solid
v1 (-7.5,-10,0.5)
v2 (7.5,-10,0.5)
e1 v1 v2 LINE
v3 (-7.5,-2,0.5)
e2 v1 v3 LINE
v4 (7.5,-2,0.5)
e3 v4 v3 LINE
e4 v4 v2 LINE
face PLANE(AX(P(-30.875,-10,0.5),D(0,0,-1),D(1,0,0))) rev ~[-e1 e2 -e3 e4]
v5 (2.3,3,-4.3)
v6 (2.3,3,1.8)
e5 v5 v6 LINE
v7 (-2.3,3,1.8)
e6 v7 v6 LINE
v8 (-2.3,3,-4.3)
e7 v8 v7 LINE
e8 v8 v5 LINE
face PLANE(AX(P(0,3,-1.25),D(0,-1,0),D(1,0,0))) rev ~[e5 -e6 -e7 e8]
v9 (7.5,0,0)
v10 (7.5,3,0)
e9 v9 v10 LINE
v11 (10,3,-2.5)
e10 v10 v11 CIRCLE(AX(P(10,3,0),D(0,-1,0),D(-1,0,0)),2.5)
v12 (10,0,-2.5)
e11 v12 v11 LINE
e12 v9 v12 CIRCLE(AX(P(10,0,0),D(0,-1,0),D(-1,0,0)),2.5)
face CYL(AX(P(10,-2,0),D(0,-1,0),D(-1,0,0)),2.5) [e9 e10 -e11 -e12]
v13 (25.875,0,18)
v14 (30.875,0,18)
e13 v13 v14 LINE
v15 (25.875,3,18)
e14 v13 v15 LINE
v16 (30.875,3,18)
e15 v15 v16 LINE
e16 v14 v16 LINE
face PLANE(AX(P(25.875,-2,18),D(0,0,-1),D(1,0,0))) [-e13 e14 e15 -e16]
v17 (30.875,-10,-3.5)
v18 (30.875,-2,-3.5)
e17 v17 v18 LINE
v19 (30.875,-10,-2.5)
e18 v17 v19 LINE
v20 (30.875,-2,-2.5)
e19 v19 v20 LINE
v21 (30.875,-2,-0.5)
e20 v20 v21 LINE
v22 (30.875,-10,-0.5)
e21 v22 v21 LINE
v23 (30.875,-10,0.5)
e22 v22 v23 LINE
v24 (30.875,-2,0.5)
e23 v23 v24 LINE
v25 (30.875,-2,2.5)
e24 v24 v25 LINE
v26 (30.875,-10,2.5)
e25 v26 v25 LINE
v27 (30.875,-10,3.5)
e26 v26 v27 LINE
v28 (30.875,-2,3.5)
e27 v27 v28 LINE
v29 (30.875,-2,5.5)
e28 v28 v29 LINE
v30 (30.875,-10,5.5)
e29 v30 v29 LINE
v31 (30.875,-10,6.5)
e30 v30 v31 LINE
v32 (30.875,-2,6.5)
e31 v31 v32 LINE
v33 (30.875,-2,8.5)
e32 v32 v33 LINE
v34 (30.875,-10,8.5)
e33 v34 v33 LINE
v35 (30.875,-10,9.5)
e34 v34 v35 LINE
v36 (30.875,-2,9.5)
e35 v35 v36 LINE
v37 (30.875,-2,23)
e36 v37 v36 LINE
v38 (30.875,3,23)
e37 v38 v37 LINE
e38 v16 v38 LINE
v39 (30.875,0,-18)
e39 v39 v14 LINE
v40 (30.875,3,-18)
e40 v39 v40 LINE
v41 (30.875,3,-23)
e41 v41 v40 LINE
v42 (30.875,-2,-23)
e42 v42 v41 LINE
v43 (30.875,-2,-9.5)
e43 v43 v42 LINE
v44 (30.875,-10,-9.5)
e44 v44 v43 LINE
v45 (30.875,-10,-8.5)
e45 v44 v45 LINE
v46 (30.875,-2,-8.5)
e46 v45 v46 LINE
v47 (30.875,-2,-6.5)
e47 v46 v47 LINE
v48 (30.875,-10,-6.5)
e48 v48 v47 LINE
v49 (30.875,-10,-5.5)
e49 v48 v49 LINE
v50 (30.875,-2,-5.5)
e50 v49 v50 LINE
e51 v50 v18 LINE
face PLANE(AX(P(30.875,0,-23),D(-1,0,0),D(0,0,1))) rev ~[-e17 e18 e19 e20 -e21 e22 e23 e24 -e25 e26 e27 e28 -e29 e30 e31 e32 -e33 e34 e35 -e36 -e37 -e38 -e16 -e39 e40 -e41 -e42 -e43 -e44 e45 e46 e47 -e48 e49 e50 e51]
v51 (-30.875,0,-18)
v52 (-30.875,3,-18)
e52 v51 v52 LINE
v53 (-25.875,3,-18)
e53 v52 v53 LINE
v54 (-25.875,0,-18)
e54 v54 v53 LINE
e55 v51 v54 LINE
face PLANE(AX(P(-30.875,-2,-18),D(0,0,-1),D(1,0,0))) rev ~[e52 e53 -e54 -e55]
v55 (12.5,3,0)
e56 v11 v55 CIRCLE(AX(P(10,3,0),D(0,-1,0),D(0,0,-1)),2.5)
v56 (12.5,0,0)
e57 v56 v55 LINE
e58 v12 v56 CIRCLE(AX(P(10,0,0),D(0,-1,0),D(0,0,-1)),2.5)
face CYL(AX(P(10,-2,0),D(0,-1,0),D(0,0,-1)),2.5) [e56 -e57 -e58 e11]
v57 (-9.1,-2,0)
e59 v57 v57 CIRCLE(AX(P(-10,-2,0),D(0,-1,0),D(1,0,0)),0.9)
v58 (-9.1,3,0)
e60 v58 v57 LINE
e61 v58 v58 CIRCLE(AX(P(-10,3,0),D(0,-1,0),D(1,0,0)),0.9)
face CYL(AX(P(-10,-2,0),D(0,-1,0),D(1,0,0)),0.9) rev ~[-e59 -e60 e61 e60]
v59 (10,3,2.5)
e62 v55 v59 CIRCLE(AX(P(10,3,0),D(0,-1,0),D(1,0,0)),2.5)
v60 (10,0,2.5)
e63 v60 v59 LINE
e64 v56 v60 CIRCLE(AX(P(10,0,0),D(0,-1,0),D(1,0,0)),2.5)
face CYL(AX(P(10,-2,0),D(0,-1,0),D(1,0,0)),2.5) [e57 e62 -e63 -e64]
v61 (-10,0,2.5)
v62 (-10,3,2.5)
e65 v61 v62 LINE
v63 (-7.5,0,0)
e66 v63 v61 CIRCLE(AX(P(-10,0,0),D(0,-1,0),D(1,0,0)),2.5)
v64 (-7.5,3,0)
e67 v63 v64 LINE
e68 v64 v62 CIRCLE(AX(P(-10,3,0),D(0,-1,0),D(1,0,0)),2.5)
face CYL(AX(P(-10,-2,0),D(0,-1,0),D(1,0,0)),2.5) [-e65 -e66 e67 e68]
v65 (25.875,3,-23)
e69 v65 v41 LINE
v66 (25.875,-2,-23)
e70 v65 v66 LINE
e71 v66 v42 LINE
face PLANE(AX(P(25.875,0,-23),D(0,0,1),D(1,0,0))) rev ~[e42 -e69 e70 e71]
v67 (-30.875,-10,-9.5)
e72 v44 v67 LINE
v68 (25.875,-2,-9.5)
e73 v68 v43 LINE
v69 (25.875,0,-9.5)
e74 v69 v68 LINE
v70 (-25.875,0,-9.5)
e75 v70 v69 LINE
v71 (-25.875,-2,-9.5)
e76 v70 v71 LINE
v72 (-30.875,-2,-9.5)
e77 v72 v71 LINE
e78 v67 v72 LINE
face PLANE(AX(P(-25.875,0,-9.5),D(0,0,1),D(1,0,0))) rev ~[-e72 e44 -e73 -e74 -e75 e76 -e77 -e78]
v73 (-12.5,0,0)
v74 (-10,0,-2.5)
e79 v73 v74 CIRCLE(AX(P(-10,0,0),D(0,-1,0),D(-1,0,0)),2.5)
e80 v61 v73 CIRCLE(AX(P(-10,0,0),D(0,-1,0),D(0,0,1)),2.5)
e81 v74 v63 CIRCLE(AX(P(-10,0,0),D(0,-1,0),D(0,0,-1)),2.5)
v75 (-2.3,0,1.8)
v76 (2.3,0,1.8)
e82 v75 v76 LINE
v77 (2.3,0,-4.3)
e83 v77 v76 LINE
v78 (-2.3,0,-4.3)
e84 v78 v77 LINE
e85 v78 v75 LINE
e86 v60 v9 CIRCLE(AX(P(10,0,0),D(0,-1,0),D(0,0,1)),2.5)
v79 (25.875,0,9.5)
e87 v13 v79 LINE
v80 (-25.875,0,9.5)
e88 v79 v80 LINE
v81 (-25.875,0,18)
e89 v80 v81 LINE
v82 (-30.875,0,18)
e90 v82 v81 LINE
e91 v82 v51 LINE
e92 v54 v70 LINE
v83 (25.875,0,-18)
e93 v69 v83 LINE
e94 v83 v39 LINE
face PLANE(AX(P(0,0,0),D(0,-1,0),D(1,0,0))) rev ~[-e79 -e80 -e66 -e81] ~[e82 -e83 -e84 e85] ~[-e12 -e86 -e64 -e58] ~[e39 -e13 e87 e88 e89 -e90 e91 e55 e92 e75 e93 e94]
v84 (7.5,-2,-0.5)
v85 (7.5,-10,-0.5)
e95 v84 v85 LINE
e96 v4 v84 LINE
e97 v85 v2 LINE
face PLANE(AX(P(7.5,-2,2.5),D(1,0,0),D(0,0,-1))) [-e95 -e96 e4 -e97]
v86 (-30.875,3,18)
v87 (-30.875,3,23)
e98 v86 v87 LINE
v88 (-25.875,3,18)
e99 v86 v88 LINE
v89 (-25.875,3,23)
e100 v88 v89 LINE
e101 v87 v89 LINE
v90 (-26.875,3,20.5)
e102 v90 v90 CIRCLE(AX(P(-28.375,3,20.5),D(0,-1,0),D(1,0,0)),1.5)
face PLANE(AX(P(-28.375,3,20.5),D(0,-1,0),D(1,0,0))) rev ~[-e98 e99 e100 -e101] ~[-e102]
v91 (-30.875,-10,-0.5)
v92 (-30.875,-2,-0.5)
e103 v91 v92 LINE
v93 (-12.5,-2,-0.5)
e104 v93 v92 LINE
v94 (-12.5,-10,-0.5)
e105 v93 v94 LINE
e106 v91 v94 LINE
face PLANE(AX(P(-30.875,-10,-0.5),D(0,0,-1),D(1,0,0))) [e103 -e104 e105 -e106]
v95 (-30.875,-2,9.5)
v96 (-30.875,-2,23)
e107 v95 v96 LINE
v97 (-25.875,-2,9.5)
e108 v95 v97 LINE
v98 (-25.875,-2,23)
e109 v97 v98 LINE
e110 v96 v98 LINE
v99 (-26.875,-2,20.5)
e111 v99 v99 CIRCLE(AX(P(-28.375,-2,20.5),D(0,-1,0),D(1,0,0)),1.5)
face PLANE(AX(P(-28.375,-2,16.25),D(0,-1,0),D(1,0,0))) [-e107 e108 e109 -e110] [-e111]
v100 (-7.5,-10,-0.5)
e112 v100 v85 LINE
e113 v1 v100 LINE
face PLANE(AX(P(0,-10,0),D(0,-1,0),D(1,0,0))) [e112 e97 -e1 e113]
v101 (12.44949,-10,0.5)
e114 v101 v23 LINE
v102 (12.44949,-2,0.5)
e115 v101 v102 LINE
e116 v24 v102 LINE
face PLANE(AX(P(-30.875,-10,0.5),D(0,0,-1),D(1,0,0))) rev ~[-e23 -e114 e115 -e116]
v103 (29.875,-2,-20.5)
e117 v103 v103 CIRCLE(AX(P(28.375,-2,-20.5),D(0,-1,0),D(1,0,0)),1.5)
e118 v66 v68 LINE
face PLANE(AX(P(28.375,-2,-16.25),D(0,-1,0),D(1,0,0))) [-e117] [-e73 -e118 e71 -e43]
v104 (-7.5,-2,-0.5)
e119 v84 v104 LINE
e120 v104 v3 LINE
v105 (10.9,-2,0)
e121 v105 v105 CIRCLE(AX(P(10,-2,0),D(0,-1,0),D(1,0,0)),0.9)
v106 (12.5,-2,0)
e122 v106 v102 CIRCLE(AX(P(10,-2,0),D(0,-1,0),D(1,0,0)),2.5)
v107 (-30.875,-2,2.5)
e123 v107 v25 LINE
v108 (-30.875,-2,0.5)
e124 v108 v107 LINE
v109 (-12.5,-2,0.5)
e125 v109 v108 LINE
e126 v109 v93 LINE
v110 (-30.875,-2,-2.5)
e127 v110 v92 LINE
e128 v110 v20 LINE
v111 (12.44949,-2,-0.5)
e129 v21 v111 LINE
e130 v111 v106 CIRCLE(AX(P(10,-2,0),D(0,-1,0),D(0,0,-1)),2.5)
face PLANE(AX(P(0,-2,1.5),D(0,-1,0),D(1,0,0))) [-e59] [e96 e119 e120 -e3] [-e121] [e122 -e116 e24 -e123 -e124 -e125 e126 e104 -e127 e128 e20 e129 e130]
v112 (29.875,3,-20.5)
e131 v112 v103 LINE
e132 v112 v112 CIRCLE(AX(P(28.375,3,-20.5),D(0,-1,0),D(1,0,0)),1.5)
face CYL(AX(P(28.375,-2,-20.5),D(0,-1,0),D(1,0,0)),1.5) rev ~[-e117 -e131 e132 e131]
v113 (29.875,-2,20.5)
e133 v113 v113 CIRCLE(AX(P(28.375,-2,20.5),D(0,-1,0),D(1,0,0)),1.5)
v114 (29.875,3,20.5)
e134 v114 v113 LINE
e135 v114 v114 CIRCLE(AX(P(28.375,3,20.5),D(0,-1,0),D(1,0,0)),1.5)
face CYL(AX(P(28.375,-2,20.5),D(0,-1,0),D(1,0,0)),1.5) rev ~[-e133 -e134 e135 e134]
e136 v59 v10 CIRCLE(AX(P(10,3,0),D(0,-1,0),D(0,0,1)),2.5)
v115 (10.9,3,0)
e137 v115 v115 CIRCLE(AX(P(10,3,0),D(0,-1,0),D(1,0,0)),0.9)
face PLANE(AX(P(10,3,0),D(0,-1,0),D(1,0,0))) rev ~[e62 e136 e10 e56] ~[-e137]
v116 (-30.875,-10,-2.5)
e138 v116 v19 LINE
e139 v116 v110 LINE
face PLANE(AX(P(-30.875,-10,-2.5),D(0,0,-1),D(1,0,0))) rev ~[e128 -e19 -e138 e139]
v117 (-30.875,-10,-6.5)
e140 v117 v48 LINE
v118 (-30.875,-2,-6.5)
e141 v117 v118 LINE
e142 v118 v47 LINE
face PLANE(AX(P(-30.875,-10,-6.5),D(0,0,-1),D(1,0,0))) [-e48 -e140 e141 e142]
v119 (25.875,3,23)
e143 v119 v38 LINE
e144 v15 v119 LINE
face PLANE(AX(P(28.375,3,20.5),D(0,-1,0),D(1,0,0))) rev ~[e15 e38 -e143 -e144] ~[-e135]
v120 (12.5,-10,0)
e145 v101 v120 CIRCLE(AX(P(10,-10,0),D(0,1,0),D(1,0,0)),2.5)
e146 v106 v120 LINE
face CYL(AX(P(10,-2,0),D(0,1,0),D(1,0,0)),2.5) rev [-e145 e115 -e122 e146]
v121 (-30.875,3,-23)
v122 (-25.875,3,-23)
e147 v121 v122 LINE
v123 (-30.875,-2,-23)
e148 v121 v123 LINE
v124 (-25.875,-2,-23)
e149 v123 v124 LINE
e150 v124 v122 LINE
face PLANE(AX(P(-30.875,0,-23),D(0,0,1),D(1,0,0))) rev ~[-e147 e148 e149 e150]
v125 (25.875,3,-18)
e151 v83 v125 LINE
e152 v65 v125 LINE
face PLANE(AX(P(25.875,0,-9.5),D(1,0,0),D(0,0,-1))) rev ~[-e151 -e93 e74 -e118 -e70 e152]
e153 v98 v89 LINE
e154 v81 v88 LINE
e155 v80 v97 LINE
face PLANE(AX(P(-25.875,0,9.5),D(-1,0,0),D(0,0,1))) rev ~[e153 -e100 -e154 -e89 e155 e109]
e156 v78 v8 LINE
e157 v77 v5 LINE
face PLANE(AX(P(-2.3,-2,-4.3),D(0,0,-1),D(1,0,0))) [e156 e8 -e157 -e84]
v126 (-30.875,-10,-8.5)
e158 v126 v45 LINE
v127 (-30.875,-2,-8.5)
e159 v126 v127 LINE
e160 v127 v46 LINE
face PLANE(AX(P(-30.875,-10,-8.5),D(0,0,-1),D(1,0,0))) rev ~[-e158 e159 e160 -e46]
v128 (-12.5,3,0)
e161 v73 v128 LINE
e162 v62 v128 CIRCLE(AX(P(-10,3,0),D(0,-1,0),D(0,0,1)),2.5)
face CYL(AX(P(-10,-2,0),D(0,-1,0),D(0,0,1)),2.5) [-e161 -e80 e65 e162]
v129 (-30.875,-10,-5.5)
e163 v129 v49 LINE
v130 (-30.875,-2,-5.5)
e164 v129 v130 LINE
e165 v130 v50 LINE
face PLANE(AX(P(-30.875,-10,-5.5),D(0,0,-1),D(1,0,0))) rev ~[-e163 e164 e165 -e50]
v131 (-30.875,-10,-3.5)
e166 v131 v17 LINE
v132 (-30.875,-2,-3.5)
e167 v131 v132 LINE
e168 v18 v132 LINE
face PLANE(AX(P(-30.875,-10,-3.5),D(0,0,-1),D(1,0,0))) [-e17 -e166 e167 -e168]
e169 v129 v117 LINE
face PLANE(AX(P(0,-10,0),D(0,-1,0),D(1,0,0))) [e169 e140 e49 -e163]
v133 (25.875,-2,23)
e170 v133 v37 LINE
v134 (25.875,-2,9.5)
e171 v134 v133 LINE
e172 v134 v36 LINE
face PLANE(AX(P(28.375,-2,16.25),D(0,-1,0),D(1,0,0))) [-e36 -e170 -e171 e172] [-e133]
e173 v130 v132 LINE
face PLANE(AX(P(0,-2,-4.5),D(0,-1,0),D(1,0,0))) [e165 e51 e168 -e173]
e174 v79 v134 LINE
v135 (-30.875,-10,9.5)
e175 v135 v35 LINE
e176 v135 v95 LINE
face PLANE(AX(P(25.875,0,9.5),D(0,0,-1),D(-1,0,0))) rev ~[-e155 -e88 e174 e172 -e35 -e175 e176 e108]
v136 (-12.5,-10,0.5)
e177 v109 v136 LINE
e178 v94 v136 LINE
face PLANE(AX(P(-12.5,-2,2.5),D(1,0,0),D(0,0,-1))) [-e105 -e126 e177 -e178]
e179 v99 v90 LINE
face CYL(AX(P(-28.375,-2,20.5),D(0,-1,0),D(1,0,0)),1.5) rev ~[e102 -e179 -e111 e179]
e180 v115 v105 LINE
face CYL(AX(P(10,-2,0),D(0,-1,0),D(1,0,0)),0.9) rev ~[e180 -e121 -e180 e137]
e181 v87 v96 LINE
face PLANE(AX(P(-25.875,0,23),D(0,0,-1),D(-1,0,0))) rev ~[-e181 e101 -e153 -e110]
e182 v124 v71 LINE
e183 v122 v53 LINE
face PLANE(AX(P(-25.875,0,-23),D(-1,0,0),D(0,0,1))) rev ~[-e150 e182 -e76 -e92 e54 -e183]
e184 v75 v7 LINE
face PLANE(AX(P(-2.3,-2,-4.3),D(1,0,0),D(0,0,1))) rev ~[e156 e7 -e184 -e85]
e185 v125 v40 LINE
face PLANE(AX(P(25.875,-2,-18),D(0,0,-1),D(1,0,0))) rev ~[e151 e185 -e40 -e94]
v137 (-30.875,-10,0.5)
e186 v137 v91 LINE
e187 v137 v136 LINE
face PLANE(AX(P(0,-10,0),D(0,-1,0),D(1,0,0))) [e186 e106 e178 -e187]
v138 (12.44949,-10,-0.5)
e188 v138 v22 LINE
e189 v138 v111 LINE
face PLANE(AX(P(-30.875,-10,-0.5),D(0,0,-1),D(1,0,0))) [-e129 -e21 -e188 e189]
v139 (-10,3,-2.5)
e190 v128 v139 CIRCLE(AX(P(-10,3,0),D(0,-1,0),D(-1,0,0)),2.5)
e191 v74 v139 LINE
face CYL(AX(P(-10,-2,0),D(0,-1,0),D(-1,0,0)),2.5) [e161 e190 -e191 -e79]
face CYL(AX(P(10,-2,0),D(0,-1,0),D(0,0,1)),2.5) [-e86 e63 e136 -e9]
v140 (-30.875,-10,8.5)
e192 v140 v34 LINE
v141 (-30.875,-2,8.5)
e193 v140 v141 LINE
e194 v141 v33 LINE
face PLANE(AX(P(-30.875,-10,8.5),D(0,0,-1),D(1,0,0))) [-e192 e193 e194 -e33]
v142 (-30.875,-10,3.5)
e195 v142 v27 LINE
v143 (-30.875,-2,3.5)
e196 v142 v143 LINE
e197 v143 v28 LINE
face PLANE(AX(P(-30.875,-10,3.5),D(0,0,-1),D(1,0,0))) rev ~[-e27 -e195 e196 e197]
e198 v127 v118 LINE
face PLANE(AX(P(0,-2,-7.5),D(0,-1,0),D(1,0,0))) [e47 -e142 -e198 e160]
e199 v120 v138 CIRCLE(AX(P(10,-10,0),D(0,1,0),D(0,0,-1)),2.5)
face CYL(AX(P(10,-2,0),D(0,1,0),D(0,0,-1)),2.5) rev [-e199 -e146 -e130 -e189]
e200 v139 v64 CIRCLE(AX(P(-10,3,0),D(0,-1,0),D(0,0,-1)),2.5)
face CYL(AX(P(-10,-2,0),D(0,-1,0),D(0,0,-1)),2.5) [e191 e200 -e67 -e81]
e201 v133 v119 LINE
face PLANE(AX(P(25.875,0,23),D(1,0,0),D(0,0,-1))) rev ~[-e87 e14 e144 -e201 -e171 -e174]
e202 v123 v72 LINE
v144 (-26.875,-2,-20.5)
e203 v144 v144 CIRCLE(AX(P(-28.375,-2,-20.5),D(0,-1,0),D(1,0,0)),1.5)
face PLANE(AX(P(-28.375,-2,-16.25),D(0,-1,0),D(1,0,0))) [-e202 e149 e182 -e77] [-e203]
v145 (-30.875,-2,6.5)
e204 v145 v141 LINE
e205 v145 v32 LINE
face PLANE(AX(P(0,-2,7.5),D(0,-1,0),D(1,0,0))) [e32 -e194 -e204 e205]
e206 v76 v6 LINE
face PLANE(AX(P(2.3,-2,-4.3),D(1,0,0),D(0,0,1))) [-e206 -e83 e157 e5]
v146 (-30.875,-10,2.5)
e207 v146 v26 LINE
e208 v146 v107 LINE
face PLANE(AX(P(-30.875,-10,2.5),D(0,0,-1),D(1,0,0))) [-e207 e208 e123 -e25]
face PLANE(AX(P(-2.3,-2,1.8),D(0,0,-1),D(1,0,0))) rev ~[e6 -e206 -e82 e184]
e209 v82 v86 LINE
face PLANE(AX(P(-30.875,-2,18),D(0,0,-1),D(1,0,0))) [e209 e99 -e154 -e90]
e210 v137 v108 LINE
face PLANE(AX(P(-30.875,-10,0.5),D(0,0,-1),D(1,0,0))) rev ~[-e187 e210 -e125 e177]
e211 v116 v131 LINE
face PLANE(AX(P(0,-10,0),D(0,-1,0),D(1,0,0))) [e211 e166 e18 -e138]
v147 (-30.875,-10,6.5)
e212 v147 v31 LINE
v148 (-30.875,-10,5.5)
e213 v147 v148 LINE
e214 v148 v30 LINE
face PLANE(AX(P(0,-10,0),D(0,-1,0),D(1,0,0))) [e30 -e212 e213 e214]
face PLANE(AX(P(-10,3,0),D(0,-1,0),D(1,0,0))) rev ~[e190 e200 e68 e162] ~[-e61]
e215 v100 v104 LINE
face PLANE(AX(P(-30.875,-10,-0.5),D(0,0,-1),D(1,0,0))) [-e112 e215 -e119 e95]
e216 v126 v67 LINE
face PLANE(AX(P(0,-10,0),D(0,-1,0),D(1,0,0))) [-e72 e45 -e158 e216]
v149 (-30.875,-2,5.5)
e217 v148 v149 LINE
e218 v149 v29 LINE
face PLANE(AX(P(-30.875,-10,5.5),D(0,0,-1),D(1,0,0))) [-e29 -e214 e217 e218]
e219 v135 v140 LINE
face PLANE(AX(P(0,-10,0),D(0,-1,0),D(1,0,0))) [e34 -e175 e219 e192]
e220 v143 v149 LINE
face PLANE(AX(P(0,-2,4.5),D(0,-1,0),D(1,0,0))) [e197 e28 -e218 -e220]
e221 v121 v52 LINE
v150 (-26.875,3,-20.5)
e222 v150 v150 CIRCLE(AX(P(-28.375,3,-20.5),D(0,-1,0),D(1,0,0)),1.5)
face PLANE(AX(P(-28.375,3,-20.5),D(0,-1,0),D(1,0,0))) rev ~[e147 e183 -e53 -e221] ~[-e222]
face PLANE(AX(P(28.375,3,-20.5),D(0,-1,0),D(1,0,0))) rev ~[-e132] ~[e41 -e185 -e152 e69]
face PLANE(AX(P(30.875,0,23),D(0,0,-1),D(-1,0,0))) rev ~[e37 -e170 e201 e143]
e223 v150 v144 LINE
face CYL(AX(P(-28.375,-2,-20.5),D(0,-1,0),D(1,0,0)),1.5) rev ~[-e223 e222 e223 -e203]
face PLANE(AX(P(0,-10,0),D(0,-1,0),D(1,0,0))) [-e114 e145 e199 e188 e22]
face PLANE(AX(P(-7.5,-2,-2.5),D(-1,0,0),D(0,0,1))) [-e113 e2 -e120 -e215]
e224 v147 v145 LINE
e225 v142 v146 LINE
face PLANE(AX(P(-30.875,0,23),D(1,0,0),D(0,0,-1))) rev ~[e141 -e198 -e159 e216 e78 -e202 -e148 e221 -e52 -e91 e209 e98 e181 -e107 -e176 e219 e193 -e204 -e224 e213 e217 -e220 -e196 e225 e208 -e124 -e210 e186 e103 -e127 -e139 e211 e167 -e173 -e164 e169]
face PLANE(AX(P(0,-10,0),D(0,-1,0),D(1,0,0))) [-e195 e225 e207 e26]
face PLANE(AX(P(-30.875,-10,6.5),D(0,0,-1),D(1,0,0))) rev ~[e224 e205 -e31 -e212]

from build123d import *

# Parameters (mm, degrees)
F1_DEPTH = 10
F2_W     = 5
F2_H     = 13.5
F2_W_2   = 61.75
F2_H_2   = 2
F4_DEPTH = 8
F5_W     = 5
F5_H     = 5
F5_R     = 1.5
F5_R_2   = 0.9
F5_W_2   = 4.6
F5_H_2   = 6.1
F7_DEPTH = 5
F8_DEPTH = 8.001
F9_DEPTH = 5.001


# Not quite as in the source:
# - a feature names something its author has since deleted; it is built from what else it names


with BuildPart() as f1:
    # F0 (on Front) → F1 (new body)
    with BuildSketch(Plane.XZ):
        Polygon((-25.875, 23), (-30.875, 23), (-30.875, -23), (-25.875, -23), (-25.875, -9.5), (0, -9.5), (25.875, -9.5), (25.875, -23), (30.875, -23), (30.875, 23), (25.875, 23), (25.875, 9.5), (0, 9.5), (-25.875, 9.5), align=None)
    extrude(amount=F1_DEPTH)

    # F2 (on face) → F4 (cut, through all)
    with BuildSketch(Plane.XZ.offset(10)):
        with Locations((-28.375, 16.25)):
            Rectangle(F2_W, F2_H)
        with Locations((0, 7.5)):
            Rectangle(F2_W_2, F2_H_2)
        with Locations((0, 4.5)):
            Rectangle(F2_W_2, F2_H_2)
        with Locations((0, 1.5)):
            Rectangle(F2_W_2, F2_H_2)
        with Locations((0, -1.5)):
            Rectangle(F2_W_2, F2_H_2)
        with Locations((0, -4.5)):
            Rectangle(F2_W_2, F2_H_2)
        with Locations((0, -7.5)):
            Rectangle(F2_W_2, F2_H_2)
        with Locations((-28.375, -16.25)):
            Rectangle(F2_W, F2_H)
        with Locations((28.375, 16.25)):
            Rectangle(F2_W, F2_H)
        with Locations((28.375, -16.25)):
            Rectangle(F2_W, F2_H)
    extrude(amount=-F4_DEPTH, mode=Mode.SUBTRACT)

    # F5 (on offset) → F7 (join, through all)
    with BuildSketch(Plane.XZ.offset(2)):
        with Locations((-28.375, 20.5)):
            Rectangle(F5_W, F5_H)
        with Locations((-28.375, 20.5)):
            Circle(F5_R, mode=Mode.SUBTRACT)
        with Locations((28.375, 20.5)):
            Rectangle(F5_W, F5_H)
        with Locations((28.375, 20.5)):
            Circle(F5_R, mode=Mode.SUBTRACT)
        with Locations((28.375, -20.5)):
            Rectangle(F5_W, F5_H)
        with Locations((28.375, -20.5)):
            Circle(F5_R, mode=Mode.SUBTRACT)
        with Locations((-28.375, -20.5)):
            Rectangle(F5_W, F5_H)
        with Locations((-28.375, -20.5)):
            Circle(F5_R, mode=Mode.SUBTRACT)
        with BuildLine():
            ThreePointArc((10, 2.5), (8.232233047, 1.767766953), (7.5, 0))
            ThreePointArc((7.5, 0), (8.232233047, -1.767766953), (10, -2.5))
            ThreePointArc((10, -2.5), (11.767766953, -1.767766953), (12.5, 0))
            ThreePointArc((12.5, 0), (11.767766953, 1.767766953), (10, 2.5))
        make_face()
        with Locations((10, 0)):
            Circle(F5_R_2, mode=Mode.SUBTRACT)
        with BuildLine():
            ThreePointArc((-10, -2.5), (-8.232233047, -1.767766953), (-7.5, 0))
            ThreePointArc((-7.5, 0), (-8.232233047, 1.767766953), (-10, 2.5))
            ThreePointArc((-10, 2.5), (-11.767766953, 1.767766953), (-12.5, 0))
            ThreePointArc((-12.5, 0), (-11.767766953, -1.767766953), (-10, -2.5))
        make_face()
        with Locations((-10, 0)):
            Circle(F5_R_2, mode=Mode.SUBTRACT)
        with Locations((0, -1.25)):
            Rectangle(F5_W_2, F5_H_2)
    extrude(amount=-F7_DEPTH)

    # F5 (on offset) → F8 (cut, through all)
    with BuildSketch(Plane.XZ.offset(2)):
        with BuildLine():
            ThreePointArc((-10, 2.5), (-8.232233047, 1.767766953), (-7.5, 0))
            Line((-7.5, 0), (-7.5, 2.5))
            Line((-7.5, 2.5), (-10, 2.5))
        make_face()
        with BuildLine():
            ThreePointArc((-12.5, 0), (-11.767766953, 1.767766953), (-10, 2.5))
            Line((-10, 2.5), (-12.5, 2.5))
            Line((-12.5, 2.5), (-12.5, 0))
        make_face()
        with BuildLine():
            Line((-12.5, -2.5), (-10, -2.5))
            ThreePointArc((-10, -2.5), (-11.767766953, -1.767766953), (-12.5, 0))
            Line((-12.5, 0), (-12.5, -2.5))
        make_face()
        with BuildLine():
            Line((-7.5, -2.5), (-7.5, 0))
            ThreePointArc((-7.5, 0), (-8.232233047, -1.767766953), (-10, -2.5))
            Line((-10, -2.5), (-7.5, -2.5))
        make_face()
        with BuildLine():
            ThreePointArc((-10, -2.5), (-8.232233047, -1.767766953), (-7.5, 0))
            ThreePointArc((-7.5, 0), (-8.232233047, 1.767766953), (-10, 2.5))
            ThreePointArc((-10, 2.5), (-11.767766953, 1.767766953), (-12.5, 0))
            ThreePointArc((-12.5, 0), (-11.767766953, -1.767766953), (-10, -2.5))
        make_face()
        with Locations((-10, 0)):
            Circle(F5_R_2, mode=Mode.SUBTRACT)
        with Locations((-10, 0)):
            Circle(F5_R_2)
        with BuildLine():
            Line((10, 2.5), (7.5, 2.5))
            Line((7.5, 2.5), (7.5, 0))
            ThreePointArc((7.5, 0), (8.232233047, 1.767766953), (10, 2.5))
        make_face()
        with BuildLine():
            ThreePointArc((10, -2.5), (8.232233047, -1.767766953), (7.5, 0))
            Line((7.5, 0), (7.5, -2.5))
            Line((7.5, -2.5), (10, -2.5))
        make_face()
        with BuildLine():
            ThreePointArc((10, 2.5), (8.232233047, 1.767766953), (7.5, 0))
            ThreePointArc((7.5, 0), (8.232233047, -1.767766953), (10, -2.5))
            ThreePointArc((10, -2.5), (11.767766953, -1.767766953), (12.5, 0))
            ThreePointArc((12.5, 0), (11.767766953, 1.767766953), (10, 2.5))
        make_face()
        with Locations((10, 0)):
            Circle(F5_R_2, mode=Mode.SUBTRACT)
        with Locations((10, 0)):
            Circle(F5_R_2)
    extrude(amount=F8_DEPTH, mode=Mode.SUBTRACT)

    # F5 (on offset) → F9 (cut, through all)
    with BuildSketch(Plane.XZ.offset(2)):
        with Locations((28.375, 20.5)):
            Circle(F5_R)
        with Locations((10, 0)):
            Circle(F5_R_2)
        with Locations((-10, 0)):
            Circle(F5_R_2)
        with Locations((28.375, -20.5)):
            Circle(F5_R)
        with Locations((-28.375, -20.5)):
            Circle(F5_R)
        with Locations((-28.375, 20.5)):
            Circle(F5_R)
    extrude(amount=-F9_DEPTH, mode=Mode.SUBTRACT)


solid = f1.part
